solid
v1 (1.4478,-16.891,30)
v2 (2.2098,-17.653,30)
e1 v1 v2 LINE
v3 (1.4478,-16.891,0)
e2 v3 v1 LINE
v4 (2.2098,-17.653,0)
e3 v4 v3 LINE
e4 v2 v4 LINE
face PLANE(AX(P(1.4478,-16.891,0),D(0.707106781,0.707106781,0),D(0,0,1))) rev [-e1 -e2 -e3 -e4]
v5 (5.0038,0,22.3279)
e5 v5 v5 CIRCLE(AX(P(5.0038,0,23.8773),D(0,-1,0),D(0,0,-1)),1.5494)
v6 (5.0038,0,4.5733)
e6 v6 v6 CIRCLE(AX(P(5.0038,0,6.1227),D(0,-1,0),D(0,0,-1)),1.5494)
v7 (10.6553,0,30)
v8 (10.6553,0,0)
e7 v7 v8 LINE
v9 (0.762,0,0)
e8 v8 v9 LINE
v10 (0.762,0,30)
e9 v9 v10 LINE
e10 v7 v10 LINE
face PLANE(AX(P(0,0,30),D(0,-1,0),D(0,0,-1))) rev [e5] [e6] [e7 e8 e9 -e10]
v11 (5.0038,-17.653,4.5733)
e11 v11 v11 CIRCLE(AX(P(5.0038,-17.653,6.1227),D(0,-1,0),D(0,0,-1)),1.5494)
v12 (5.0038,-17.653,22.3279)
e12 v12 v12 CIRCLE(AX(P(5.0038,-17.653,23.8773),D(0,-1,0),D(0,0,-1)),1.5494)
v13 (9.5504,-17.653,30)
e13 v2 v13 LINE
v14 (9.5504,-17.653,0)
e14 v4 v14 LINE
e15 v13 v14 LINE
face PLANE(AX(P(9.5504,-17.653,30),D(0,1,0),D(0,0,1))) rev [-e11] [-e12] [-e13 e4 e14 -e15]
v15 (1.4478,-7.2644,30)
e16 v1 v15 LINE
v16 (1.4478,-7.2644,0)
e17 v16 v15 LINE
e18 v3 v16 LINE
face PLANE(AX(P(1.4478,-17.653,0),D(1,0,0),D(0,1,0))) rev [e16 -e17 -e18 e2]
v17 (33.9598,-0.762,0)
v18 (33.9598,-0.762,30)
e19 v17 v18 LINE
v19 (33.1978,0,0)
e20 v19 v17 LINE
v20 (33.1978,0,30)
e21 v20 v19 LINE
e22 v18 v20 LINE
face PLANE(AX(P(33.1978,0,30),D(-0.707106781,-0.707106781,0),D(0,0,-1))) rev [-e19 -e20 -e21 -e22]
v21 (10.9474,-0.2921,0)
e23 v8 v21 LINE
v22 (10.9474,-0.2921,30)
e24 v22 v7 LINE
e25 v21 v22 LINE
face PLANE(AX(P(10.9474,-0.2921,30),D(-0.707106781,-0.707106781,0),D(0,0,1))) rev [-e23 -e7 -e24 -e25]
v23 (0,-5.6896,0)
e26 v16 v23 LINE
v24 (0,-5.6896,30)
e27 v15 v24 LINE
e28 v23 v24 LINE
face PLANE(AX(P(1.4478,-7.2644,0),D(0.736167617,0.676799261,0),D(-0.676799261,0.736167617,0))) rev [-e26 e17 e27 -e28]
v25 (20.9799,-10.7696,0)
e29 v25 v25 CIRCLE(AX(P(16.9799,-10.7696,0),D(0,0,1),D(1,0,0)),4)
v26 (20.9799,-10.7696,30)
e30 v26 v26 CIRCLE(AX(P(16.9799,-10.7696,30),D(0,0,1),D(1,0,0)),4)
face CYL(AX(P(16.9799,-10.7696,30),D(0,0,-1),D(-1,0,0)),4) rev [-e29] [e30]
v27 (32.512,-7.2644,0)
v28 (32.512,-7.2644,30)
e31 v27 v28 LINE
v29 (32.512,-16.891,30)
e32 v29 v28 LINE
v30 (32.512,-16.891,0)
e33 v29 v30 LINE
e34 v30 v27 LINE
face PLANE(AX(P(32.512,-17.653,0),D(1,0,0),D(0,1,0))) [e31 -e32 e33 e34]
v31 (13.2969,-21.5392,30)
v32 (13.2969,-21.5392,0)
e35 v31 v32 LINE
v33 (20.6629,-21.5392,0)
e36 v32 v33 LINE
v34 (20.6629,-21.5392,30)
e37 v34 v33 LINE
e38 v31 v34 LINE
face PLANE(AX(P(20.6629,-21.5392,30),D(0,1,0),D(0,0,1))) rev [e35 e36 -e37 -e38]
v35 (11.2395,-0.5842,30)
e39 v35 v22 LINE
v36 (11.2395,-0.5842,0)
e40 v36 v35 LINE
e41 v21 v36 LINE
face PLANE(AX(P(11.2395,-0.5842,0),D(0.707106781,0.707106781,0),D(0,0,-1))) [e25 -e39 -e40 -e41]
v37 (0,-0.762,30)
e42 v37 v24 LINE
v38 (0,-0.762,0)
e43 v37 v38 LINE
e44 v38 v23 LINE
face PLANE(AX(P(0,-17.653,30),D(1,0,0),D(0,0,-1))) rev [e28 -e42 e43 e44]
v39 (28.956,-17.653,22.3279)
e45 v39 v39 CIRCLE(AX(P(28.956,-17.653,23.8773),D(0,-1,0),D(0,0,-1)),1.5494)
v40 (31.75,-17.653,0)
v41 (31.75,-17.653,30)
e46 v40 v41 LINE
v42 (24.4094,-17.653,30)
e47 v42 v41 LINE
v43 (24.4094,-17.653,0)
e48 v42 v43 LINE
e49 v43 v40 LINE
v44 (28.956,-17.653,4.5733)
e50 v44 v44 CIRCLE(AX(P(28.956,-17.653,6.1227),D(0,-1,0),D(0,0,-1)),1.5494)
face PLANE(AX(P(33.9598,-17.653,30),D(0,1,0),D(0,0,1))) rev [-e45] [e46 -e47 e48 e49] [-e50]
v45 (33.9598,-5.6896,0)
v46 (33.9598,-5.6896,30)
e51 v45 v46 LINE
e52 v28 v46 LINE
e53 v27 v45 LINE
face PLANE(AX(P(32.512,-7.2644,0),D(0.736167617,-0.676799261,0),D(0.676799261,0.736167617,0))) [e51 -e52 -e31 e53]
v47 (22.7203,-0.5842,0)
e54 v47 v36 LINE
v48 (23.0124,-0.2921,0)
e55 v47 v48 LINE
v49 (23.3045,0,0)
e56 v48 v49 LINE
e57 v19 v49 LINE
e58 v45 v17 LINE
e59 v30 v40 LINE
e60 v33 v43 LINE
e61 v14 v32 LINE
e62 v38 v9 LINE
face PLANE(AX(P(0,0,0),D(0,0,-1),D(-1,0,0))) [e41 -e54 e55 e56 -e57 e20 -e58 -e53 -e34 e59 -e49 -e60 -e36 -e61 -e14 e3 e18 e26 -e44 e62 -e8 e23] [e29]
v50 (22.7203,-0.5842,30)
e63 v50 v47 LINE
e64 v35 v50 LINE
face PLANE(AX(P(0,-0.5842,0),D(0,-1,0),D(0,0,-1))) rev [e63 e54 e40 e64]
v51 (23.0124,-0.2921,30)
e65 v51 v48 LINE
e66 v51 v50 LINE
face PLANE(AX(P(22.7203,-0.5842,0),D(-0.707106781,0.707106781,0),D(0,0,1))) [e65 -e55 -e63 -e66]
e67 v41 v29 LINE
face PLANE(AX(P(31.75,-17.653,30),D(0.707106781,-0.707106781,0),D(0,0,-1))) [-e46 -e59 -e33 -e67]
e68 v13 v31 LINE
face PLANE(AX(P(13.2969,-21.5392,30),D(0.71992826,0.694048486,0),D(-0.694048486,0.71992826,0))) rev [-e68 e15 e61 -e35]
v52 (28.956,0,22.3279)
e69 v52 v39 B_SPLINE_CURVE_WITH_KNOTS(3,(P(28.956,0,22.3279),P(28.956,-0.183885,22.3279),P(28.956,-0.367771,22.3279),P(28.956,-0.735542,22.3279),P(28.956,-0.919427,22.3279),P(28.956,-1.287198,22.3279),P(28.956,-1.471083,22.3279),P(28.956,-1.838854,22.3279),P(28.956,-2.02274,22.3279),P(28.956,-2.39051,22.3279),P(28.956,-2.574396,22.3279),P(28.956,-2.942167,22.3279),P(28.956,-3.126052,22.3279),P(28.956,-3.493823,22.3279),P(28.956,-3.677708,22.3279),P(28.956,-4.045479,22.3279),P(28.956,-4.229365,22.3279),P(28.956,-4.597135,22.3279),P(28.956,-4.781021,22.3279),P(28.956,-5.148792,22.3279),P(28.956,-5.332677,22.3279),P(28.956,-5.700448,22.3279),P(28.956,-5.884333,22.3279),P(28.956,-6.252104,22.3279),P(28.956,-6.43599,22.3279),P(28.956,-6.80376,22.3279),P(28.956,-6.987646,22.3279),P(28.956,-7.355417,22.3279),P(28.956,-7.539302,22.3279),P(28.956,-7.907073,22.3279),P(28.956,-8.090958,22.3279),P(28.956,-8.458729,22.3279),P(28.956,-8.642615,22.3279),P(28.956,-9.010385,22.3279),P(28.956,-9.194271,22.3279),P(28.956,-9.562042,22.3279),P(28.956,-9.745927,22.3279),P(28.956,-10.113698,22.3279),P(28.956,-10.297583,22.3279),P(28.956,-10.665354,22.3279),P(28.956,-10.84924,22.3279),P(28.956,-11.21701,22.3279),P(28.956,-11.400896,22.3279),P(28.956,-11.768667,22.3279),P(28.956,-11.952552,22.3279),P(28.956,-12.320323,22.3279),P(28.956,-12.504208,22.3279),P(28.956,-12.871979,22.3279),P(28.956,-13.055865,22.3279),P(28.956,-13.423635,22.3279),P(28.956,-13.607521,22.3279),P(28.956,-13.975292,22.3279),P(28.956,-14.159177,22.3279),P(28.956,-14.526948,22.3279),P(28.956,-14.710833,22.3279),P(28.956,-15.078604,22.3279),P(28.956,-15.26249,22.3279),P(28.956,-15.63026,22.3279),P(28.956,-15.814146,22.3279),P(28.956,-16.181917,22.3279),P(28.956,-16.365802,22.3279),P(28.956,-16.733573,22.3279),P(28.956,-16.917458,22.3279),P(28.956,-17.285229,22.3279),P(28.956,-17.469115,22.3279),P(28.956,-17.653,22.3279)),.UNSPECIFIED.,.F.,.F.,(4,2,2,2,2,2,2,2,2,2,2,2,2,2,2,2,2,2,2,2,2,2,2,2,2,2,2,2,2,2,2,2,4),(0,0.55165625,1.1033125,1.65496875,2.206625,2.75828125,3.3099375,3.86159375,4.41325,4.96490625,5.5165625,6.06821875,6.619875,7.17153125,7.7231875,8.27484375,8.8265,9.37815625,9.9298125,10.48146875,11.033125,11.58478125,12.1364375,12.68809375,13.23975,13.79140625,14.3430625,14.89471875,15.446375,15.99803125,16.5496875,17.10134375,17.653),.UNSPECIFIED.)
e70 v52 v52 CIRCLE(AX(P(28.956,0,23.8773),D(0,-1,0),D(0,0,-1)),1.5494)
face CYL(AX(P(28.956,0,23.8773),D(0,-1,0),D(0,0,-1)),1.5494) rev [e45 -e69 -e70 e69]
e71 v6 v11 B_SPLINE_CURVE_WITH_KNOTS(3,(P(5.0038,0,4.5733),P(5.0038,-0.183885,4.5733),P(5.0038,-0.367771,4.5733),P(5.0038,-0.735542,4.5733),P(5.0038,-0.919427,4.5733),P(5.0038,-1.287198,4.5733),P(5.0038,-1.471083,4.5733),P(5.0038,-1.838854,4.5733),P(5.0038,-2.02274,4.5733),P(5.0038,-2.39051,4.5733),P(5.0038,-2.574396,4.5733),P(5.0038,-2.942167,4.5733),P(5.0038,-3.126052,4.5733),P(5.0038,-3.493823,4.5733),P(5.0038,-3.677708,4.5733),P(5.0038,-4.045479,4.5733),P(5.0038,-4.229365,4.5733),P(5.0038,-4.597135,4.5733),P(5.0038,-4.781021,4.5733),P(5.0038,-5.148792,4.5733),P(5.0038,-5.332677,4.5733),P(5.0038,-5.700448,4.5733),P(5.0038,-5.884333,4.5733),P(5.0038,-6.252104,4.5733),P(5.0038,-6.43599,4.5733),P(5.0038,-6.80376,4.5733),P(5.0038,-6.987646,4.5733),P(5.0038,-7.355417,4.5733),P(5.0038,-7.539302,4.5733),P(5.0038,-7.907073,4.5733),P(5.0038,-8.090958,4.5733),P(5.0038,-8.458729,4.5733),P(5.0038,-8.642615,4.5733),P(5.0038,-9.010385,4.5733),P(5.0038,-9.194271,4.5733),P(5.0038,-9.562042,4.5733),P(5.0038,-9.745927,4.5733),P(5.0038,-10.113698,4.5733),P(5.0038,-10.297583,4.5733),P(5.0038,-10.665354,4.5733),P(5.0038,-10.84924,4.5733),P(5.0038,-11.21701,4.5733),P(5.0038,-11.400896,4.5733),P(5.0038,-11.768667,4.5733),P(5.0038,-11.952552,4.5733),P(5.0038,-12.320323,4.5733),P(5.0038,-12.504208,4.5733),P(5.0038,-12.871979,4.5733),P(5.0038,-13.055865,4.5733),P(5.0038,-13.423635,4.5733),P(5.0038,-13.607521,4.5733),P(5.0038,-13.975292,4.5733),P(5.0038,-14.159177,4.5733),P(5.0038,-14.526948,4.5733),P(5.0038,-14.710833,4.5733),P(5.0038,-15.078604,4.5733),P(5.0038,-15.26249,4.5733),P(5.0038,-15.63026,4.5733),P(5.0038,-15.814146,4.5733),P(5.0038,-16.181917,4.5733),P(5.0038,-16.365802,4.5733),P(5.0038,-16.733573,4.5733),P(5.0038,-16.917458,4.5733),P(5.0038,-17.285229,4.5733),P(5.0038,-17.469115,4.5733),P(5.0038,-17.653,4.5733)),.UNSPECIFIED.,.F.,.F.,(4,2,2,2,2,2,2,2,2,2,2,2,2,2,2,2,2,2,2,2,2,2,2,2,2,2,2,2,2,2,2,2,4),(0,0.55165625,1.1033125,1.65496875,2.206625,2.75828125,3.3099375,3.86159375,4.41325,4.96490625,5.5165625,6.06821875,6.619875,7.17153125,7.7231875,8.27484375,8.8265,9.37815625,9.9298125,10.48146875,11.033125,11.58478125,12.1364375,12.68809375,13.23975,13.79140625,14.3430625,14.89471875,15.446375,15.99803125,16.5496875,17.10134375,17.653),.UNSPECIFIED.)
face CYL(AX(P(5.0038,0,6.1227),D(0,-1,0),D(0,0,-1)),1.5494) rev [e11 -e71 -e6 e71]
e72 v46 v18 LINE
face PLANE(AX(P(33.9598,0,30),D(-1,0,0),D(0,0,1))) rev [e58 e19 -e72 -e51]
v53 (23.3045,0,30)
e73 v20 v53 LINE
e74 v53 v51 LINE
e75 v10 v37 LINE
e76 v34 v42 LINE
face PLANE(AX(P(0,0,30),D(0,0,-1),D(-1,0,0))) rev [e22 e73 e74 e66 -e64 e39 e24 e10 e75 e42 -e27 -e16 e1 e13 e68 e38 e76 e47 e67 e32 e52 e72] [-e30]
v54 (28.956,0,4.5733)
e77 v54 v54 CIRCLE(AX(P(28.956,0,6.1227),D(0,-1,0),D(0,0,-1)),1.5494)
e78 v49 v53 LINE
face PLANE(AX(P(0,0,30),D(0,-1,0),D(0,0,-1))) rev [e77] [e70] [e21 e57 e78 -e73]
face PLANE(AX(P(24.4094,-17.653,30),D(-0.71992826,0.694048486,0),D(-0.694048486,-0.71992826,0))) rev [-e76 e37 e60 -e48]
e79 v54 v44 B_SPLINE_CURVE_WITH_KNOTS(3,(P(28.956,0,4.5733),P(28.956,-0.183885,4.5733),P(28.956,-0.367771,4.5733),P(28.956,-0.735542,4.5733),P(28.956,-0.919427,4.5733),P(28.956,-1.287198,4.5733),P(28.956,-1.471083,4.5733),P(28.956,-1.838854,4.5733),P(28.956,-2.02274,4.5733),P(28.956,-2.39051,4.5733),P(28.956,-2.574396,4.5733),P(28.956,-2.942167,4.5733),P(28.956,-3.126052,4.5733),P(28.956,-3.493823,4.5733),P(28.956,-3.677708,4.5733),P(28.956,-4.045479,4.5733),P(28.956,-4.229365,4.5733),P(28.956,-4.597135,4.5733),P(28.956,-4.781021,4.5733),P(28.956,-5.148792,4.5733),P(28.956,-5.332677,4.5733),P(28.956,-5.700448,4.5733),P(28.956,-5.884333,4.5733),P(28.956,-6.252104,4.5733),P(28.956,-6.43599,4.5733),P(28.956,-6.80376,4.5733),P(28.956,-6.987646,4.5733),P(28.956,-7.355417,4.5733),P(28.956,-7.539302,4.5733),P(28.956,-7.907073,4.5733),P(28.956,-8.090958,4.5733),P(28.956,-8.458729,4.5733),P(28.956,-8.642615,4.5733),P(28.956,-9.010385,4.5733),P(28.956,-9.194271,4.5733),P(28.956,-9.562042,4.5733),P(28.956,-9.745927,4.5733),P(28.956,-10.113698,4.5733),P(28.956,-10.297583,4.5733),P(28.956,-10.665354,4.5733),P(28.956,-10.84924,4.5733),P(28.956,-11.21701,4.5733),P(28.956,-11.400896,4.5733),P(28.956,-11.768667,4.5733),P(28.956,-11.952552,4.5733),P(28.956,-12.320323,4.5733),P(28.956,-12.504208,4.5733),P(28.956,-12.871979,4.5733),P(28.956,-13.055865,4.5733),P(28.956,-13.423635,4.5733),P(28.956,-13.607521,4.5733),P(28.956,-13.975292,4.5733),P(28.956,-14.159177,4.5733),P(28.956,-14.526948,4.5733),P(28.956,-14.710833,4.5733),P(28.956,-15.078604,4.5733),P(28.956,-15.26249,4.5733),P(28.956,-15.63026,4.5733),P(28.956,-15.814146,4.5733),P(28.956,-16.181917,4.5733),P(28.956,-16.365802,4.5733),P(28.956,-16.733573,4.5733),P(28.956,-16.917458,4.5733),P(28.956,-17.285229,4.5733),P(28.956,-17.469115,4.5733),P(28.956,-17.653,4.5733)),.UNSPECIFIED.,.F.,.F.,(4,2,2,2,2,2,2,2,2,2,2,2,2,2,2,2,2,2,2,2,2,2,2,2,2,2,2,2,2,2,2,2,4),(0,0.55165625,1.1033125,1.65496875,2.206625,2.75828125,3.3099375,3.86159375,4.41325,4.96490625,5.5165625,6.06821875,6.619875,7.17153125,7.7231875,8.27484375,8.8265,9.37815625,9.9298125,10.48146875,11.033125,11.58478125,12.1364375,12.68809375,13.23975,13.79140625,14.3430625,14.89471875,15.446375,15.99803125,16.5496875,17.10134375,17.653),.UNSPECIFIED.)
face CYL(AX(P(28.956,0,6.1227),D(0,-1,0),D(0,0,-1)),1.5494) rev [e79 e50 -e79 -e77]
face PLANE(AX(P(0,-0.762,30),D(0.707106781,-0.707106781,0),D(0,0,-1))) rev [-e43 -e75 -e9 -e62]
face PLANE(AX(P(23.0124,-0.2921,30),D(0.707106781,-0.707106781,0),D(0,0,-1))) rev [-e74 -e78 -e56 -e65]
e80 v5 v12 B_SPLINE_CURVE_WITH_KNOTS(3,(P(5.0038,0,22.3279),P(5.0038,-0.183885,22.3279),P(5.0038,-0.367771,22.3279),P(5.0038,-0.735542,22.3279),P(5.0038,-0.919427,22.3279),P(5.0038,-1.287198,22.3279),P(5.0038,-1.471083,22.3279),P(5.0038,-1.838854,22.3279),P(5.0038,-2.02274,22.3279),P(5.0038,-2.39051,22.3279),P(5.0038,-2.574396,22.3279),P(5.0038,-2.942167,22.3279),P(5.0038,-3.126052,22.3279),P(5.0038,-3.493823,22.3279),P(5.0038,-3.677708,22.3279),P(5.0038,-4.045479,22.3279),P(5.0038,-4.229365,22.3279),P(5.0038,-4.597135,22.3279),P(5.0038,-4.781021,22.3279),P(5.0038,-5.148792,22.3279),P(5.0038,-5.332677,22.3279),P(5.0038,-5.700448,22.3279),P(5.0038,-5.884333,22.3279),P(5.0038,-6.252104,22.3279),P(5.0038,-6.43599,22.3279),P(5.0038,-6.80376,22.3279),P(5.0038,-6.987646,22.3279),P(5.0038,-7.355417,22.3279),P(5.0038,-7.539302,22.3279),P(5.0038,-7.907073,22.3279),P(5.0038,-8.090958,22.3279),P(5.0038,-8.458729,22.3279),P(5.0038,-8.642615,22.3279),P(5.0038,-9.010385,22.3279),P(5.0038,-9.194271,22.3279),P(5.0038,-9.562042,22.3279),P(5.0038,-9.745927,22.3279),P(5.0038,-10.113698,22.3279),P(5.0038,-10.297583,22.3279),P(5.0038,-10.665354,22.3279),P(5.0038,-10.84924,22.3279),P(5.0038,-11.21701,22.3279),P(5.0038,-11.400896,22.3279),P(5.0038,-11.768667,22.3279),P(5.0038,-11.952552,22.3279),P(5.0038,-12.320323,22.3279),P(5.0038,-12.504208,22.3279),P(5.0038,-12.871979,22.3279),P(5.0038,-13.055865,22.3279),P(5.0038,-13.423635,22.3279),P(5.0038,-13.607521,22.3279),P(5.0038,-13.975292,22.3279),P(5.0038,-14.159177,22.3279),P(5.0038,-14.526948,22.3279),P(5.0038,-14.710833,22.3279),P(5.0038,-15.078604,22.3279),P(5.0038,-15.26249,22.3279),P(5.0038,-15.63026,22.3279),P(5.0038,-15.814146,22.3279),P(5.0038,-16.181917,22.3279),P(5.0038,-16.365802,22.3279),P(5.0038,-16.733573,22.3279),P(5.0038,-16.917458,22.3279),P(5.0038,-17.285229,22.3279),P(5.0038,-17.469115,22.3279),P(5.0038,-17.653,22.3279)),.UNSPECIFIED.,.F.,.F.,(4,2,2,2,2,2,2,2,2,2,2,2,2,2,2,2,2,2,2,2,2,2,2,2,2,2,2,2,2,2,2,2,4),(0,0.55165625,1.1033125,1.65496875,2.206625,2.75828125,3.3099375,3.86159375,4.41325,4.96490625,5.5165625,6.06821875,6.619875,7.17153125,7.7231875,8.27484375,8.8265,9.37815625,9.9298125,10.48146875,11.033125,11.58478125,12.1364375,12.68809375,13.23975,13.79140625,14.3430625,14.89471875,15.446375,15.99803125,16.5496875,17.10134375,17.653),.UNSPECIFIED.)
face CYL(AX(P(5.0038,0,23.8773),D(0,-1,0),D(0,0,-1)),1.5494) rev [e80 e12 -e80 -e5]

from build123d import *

# Parameters (mm, degrees)
SKETCH1_R           = 4
BOSS_EXTRUDE1_DEPTH = 30
SKETCH2_R           = 1.5494
CUT_EXTRUDE1_DEPTH  = 49.630200751
SKETCH3_W           = 12.065
SKETCH3_H           = 30
CUT_EXTRUDE2_DEPTH  = 0.5842
CHAMFER1_SIZE       = 0.2921
CUT_EXTRUDE3_DEPTH  = 51.171756524
CHAMFER2_SIZE       = 0.762


with BuildPart() as part:
    # Sketch1 → Boss-Extrude1 (new body)
    with BuildSketch(Plane.XY):
        Polygon((0, 0), (33.9598, 0), (33.9598, -17.653), (24.4094, -17.653), (20.6629, -21.5392), (13.2969, -21.5392), (9.5504, -17.653), (0, -17.653), align=None)
        with Locations((16.9799, -10.7696)):
            Circle(SKETCH1_R, mode=Mode.SUBTRACT)
    extrude(amount=BOSS_EXTRUDE1_DEPTH)

    # Sketch2 → Cut-Extrude1 (cut, through all)
    with BuildSketch(Plane(origin=(0, -17.653, 0), x_dir=(-1, 0, 0), z_dir=(0, -1, 0))):
        with Locations(Location((-5.0038, -23.8773, 0), (0, 0, 90))):
            Circle(SKETCH2_R)
        with Locations(Location((-5.0038, -6.1227, 0), (0, 0, 90))):
            Circle(SKETCH2_R)
        with Locations(Location((-28.956, -6.1227, 0), (0, 0, 90))):
            Circle(SKETCH2_R)
        with Locations(Location((-28.956, -23.8773, 0), (0, 0, 90))):
            Circle(SKETCH2_R)
    extrude(amount=-CUT_EXTRUDE1_DEPTH, mode=Mode.SUBTRACT)

    # Sketch3 → Cut-Extrude2 (cut)
    with BuildSketch(Plane(origin=(0, 0, 0), x_dir=(1, 0, 0), z_dir=(0, 1, 0))):
        with Locations((16.9799, -15)):
            Rectangle(SKETCH3_W, SKETCH3_H)
    extrude(amount=-CUT_EXTRUDE2_DEPTH, mode=Mode.SUBTRACT)

    # Chamfer1
    chamfer1_edges = [part.edges().sort_by_distance(p)[0] for p in [
        (23.0124, -0.5842, 15),
        (10.9474, -0.5842, 15),
    ]]
    chamfer(chamfer1_edges, length=CHAMFER1_SIZE)
    chamfer1_2_edges = [part.edges().sort_by_distance(p)[0] for p in [
        (23.0124, 0, 15),
        (10.9474, 0, 15),
    ]]
    chamfer(chamfer1_2_edges, length=CHAMFER1_SIZE - 0.0001)  # a hair under: the kernel refuses the full size

    # Sketch4 → Cut-Extrude3 (cut, through all)
    with BuildSketch(Plane.XY.offset(30)):
        Polygon((1.4478, -17.653), (1.4478, -7.2644), (0, -5.6896), (0, -17.653), align=None)
    cut_extrude3 = extrude(amount=-CUT_EXTRUDE3_DEPTH, mode=Mode.SUBTRACT)

    # Mirror1: Cut-Extrude3 across plane
    add(cut_extrude3.mirror(Plane.ZY.offset(-16.9799)), mode=Mode.SUBTRACT)

    # Chamfer2
    chamfer2_edges = [part.edges().sort_by_distance(p)[0] for p in [
        (32.512, -17.653, 15),
        (0, 0, 15),
        (33.9598, 0, 15),
        (1.4478, -17.653, 15),
    ]]
    chamfer(chamfer2_edges, length=CHAMFER2_SIZE)


solid = part.part
